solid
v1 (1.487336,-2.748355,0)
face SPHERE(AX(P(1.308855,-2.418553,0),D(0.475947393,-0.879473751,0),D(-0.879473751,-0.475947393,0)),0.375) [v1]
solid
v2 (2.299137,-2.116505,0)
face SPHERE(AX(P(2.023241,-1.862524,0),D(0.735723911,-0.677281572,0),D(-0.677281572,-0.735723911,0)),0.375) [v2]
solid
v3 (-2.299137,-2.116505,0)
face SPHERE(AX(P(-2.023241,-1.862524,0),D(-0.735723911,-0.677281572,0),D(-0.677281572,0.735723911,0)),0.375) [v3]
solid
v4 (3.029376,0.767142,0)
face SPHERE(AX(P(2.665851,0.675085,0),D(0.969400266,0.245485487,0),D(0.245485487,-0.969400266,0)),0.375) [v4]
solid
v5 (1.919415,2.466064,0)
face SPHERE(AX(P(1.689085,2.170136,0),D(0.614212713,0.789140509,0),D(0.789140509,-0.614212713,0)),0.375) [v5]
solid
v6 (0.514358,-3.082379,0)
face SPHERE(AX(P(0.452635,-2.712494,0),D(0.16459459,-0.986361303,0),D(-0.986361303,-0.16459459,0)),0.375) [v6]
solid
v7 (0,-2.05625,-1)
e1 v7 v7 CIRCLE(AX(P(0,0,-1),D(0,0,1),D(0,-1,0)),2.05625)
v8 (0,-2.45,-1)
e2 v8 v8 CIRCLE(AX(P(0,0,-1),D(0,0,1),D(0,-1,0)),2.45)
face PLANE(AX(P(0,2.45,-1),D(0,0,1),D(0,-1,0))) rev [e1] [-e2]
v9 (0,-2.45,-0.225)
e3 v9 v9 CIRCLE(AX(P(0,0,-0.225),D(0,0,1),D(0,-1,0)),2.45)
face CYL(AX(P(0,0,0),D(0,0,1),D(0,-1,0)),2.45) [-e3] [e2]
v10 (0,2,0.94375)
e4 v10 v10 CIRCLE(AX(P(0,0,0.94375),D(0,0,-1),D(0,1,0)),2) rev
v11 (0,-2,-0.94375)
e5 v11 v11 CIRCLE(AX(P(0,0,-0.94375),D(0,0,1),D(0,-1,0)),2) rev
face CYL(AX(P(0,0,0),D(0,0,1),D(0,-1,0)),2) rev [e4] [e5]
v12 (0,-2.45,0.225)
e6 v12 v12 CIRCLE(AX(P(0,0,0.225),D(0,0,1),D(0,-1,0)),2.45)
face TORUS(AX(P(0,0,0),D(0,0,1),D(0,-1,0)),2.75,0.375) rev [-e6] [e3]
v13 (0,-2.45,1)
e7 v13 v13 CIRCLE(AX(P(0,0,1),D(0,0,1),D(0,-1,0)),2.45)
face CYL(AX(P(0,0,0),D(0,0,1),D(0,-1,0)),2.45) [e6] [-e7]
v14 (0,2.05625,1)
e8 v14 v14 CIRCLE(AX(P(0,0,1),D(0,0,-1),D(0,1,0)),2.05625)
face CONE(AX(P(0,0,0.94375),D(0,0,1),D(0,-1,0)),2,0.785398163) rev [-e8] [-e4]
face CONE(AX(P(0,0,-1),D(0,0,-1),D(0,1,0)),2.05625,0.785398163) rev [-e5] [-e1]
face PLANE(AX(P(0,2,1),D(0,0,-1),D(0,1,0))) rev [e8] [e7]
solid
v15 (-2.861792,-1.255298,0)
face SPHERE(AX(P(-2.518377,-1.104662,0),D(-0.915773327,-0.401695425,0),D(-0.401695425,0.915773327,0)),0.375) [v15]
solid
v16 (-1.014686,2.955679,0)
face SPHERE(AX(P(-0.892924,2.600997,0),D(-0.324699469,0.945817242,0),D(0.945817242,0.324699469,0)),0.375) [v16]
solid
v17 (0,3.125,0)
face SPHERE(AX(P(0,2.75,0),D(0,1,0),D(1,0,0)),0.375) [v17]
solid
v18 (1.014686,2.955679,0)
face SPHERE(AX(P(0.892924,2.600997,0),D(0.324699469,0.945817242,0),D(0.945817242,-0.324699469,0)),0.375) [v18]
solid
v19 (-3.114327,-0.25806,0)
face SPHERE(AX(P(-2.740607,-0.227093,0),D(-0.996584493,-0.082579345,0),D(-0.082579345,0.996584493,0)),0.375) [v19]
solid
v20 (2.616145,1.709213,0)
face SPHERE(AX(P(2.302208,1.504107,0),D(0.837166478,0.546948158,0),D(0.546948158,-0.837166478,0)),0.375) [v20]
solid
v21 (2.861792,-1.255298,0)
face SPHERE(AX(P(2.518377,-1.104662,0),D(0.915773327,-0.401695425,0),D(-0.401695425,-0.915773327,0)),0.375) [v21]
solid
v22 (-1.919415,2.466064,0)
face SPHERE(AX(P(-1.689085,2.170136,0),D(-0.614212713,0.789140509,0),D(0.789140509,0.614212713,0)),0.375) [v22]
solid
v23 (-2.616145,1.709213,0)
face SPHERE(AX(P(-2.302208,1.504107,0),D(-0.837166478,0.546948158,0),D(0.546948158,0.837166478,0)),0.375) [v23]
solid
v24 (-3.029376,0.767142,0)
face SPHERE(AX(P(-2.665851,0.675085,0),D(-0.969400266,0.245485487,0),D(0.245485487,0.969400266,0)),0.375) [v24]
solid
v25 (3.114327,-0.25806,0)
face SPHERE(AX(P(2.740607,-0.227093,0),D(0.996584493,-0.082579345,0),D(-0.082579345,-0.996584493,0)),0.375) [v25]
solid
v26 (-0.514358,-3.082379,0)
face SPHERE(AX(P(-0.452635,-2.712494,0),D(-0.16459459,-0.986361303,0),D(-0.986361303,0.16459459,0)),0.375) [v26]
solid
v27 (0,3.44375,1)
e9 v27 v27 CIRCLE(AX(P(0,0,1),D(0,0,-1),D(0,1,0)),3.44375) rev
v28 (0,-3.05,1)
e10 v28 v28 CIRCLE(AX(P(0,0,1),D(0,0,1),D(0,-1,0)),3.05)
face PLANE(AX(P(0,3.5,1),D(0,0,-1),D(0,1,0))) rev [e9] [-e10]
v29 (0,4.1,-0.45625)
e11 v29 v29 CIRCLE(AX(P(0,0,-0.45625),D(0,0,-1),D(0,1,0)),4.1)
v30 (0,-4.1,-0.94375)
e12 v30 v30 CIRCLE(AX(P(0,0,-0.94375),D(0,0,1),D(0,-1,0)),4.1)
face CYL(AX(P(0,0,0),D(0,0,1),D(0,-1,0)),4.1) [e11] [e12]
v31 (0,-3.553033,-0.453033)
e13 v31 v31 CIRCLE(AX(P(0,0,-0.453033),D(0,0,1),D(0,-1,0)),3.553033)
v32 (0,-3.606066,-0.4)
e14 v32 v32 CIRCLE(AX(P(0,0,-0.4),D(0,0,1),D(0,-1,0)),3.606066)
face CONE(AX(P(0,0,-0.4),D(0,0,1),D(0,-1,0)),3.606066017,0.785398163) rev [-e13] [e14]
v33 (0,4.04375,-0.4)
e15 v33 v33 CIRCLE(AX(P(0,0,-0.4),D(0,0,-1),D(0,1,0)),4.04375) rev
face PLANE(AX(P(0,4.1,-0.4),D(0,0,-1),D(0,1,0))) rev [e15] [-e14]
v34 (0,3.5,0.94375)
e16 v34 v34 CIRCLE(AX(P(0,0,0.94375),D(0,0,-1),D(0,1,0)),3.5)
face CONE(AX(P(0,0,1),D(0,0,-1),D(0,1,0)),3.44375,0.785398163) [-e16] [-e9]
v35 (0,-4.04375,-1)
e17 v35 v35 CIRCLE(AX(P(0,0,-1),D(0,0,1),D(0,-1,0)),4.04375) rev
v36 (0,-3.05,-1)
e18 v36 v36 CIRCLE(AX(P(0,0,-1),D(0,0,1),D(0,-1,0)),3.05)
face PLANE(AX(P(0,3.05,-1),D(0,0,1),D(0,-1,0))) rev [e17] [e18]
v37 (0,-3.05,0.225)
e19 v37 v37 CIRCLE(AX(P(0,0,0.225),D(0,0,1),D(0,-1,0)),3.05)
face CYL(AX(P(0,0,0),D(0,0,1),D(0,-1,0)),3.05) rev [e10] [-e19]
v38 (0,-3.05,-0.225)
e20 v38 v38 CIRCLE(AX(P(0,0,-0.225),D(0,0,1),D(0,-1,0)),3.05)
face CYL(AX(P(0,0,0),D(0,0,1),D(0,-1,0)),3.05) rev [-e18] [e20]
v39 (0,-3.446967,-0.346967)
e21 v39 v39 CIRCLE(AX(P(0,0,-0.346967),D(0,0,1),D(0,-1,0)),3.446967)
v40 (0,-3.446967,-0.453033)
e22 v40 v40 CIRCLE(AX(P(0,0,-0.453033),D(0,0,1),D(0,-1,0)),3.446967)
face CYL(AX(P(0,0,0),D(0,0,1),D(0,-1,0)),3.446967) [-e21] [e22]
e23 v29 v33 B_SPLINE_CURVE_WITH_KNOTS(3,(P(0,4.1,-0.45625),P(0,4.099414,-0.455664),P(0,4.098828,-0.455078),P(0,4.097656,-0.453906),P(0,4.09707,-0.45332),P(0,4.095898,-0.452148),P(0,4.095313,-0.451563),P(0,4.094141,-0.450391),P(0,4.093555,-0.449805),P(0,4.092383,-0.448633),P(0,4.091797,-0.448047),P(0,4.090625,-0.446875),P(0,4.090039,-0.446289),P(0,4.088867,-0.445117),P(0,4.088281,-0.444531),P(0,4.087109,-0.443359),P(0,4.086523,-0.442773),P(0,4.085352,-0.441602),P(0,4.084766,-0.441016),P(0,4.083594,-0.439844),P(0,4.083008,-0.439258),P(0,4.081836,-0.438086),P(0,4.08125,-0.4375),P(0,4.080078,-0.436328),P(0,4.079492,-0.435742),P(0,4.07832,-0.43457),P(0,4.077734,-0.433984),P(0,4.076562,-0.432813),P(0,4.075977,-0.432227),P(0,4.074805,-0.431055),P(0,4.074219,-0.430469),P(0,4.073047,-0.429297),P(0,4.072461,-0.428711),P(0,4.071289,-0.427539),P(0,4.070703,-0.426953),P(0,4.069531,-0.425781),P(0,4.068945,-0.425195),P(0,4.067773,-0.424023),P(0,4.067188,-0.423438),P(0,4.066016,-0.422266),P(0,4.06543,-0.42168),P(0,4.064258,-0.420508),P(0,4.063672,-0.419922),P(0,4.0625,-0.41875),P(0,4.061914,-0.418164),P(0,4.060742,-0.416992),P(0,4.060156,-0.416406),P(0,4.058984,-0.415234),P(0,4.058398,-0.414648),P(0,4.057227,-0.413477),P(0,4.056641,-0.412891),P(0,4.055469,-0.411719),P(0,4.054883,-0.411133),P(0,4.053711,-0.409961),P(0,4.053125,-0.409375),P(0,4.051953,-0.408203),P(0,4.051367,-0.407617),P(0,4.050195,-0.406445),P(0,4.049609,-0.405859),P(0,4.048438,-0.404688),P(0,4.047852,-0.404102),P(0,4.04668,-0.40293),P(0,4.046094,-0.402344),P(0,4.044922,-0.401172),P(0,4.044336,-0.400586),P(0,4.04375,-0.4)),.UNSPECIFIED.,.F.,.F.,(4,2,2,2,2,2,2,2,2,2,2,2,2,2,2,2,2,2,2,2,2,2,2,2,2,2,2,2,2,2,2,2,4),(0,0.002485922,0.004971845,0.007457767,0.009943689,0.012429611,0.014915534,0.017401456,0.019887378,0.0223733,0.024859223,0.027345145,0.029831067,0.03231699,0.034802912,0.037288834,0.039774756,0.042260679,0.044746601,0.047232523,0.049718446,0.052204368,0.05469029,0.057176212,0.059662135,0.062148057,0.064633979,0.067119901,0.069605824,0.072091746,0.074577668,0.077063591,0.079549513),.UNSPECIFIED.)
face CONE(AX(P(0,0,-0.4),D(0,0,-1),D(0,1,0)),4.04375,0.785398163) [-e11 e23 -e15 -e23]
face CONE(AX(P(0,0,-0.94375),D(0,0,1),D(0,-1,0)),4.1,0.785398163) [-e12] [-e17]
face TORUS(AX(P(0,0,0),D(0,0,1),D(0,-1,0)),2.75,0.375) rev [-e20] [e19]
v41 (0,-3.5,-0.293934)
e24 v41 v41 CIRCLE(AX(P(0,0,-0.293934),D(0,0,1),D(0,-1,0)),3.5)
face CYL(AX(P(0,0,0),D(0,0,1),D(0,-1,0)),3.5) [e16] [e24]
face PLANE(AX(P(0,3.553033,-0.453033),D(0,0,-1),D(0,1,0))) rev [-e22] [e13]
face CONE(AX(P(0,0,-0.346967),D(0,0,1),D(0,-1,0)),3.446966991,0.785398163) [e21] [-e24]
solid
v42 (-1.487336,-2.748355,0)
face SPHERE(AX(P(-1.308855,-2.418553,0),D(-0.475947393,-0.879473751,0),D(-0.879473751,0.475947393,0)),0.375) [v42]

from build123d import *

# Parameters (mm, degrees)
FILLET1_SIZE      = 0.05625
FILLET2_SIZE      = 0.05625
CIRPATTERN3_COUNT = 19


with BuildPart() as part:
    # Sketch2 → Revolve1 (revolve)
    with BuildSketch(Plane(origin=(0, 0, 0), x_dir=(0, 0, -1), z_dir=(1, 0, 0))):
        with BuildLine():
            Line((1, 4.1), (0.4, 4.1))
            Line((0.4, 4.1), (0.4, 3.606066017))
            Line((0.4, 3.606066017), (0.453033009, 3.553033009))
            Line((0.453033009, 3.553033009), (0.453033009, 3.446966991))
            Line((0.453033009, 3.446966991), (0.346966991, 3.446966991))
            Line((0.346966991, 3.446966991), (0.293933983, 3.5))
            Line((0.293933983, 3.5), (-1, 3.5))
            Line((-1, 3.5), (-1, 3.05))
            Line((-1, 3.05), (-0.225, 3.05))
            ThreePointArc((-0.225, 3.05), (0, 3.125), (0.225, 3.05))
            Line((0.225, 3.05), (1, 3.05))
            Line((1, 3.05), (1, 4.1))
        make_face()
        with BuildLine():
            Line((1, 2), (-1, 2))
            Line((-1, 2), (-1, 2.45))
            Line((-1, 2.45), (-0.225, 2.45))
            ThreePointArc((-0.225, 2.45), (0, 2.375), (0.225, 2.45))
            Line((0.225, 2.45), (1, 2.45))
            Line((1, 2.45), (1, 2))
        make_face()
    revolve(axis=Axis((0, 0, 0), (0, 0, -1)))

    # Fillet1
    fillet1_edges = [part.edges().sort_by_distance(p)[0] for p in [
        (0, -4.1, -1),
        (0, -4.1, -0.4),
        (0, -3.5, 1),
    ]]
    chamfer(fillet1_edges, length=FILLET1_SIZE)

    # Fillet2
    fillet2_edges = [part.edges().sort_by_distance(p)[0] for p in [
        (0, -2, -1),
        (0, -2, 1),
    ]]
    chamfer(fillet2_edges, length=FILLET2_SIZE)


with BuildPart() as body_2:
    # Sketch7 → Revolve3 (revolve)
    with BuildSketch(Plane.XY):
        with BuildLine():
            Line((0, 3.125), (0, 2.375))
            ThreePointArc((0, 2.375), (-0.375, 2.75), (0, 3.125))
        make_face()
    revolve(axis=Axis((0, 3.125, 0), (0, -1, 0)))


with BuildPart() as cirpattern3_1:
    # CirPattern3: pattern copy
    add(body_2.part.rotate(Axis((0, 0, 0), (0, 0, -1)), 1 * 360 / CIRPATTERN3_COUNT))


with BuildPart() as cirpattern3_2:
    # CirPattern3: pattern copy
    add(body_2.part.rotate(Axis((0, 0, 0), (0, 0, -1)), 2 * 360 / CIRPATTERN3_COUNT))


with BuildPart() as cirpattern3_3:
    # CirPattern3: pattern copy
    add(body_2.part.rotate(Axis((0, 0, 0), (0, 0, -1)), 3 * 360 / CIRPATTERN3_COUNT))


with BuildPart() as cirpattern3_4:
    # CirPattern3: pattern copy
    add(body_2.part.rotate(Axis((0, 0, 0), (0, 0, -1)), 4 * 360 / CIRPATTERN3_COUNT))


with BuildPart() as cirpattern3_5:
    # CirPattern3: pattern copy
    add(body_2.part.rotate(Axis((0, 0, 0), (0, 0, -1)), 5 * 360 / CIRPATTERN3_COUNT))


with BuildPart() as cirpattern3_6:
    # CirPattern3: pattern copy
    add(body_2.part.rotate(Axis((0, 0, 0), (0, 0, -1)), 6 * 360 / CIRPATTERN3_COUNT))


with BuildPart() as cirpattern3_7:
    # CirPattern3: pattern copy
    add(body_2.part.rotate(Axis((0, 0, 0), (0, 0, -1)), 7 * 360 / CIRPATTERN3_COUNT))


with BuildPart() as cirpattern3_8:
    # CirPattern3: pattern copy
    add(body_2.part.rotate(Axis((0, 0, 0), (0, 0, -1)), 8 * 360 / CIRPATTERN3_COUNT))


with BuildPart() as cirpattern3_9:
    # CirPattern3: pattern copy
    add(body_2.part.rotate(Axis((0, 0, 0), (0, 0, -1)), 9 * 360 / CIRPATTERN3_COUNT))


with BuildPart() as cirpattern3_10:
    # CirPattern3: pattern copy
    add(body_2.part.rotate(Axis((0, 0, 0), (0, 0, -1)), 10 * 360 / CIRPATTERN3_COUNT))


with BuildPart() as cirpattern3_11:
    # CirPattern3: pattern copy
    add(body_2.part.rotate(Axis((0, 0, 0), (0, 0, -1)), 11 * 360 / CIRPATTERN3_COUNT))


with BuildPart() as cirpattern3_12:
    # CirPattern3: pattern copy
    add(body_2.part.rotate(Axis((0, 0, 0), (0, 0, -1)), 12 * 360 / CIRPATTERN3_COUNT))


with BuildPart() as cirpattern3_13:
    # CirPattern3: pattern copy
    add(body_2.part.rotate(Axis((0, 0, 0), (0, 0, -1)), 13 * 360 / CIRPATTERN3_COUNT))


with BuildPart() as cirpattern3_14:
    # CirPattern3: pattern copy
    add(body_2.part.rotate(Axis((0, 0, 0), (0, 0, -1)), 14 * 360 / CIRPATTERN3_COUNT))


with BuildPart() as cirpattern3_15:
    # CirPattern3: pattern copy
    add(body_2.part.rotate(Axis((0, 0, 0), (0, 0, -1)), 15 * 360 / CIRPATTERN3_COUNT))


with BuildPart() as cirpattern3_16:
    # CirPattern3: pattern copy
    add(body_2.part.rotate(Axis((0, 0, 0), (0, 0, -1)), 16 * 360 / CIRPATTERN3_COUNT))


with BuildPart() as cirpattern3_17:
    # CirPattern3: pattern copy
    add(body_2.part.rotate(Axis((0, 0, 0), (0, 0, -1)), 17 * 360 / CIRPATTERN3_COUNT))


with BuildPart() as cirpattern3_18:
    # CirPattern3: pattern copy
    add(body_2.part.rotate(Axis((0, 0, 0), (0, 0, -1)), 18 * 360 / CIRPATTERN3_COUNT))


solid = Compound([part.part, body_2.part, cirpattern3_1.part, cirpattern3_2.part, cirpattern3_3.part, cirpattern3_4.part, cirpattern3_5.part, cirpattern3_6.part, cirpattern3_7.part, cirpattern3_8.part, cirpattern3_9.part, cirpattern3_10.part, cirpattern3_11.part, cirpattern3_12.part, cirpattern3_13.part, cirpattern3_14.part, cirpattern3_15.part, cirpattern3_16.part, cirpattern3_17.part, cirpattern3_18.part])
